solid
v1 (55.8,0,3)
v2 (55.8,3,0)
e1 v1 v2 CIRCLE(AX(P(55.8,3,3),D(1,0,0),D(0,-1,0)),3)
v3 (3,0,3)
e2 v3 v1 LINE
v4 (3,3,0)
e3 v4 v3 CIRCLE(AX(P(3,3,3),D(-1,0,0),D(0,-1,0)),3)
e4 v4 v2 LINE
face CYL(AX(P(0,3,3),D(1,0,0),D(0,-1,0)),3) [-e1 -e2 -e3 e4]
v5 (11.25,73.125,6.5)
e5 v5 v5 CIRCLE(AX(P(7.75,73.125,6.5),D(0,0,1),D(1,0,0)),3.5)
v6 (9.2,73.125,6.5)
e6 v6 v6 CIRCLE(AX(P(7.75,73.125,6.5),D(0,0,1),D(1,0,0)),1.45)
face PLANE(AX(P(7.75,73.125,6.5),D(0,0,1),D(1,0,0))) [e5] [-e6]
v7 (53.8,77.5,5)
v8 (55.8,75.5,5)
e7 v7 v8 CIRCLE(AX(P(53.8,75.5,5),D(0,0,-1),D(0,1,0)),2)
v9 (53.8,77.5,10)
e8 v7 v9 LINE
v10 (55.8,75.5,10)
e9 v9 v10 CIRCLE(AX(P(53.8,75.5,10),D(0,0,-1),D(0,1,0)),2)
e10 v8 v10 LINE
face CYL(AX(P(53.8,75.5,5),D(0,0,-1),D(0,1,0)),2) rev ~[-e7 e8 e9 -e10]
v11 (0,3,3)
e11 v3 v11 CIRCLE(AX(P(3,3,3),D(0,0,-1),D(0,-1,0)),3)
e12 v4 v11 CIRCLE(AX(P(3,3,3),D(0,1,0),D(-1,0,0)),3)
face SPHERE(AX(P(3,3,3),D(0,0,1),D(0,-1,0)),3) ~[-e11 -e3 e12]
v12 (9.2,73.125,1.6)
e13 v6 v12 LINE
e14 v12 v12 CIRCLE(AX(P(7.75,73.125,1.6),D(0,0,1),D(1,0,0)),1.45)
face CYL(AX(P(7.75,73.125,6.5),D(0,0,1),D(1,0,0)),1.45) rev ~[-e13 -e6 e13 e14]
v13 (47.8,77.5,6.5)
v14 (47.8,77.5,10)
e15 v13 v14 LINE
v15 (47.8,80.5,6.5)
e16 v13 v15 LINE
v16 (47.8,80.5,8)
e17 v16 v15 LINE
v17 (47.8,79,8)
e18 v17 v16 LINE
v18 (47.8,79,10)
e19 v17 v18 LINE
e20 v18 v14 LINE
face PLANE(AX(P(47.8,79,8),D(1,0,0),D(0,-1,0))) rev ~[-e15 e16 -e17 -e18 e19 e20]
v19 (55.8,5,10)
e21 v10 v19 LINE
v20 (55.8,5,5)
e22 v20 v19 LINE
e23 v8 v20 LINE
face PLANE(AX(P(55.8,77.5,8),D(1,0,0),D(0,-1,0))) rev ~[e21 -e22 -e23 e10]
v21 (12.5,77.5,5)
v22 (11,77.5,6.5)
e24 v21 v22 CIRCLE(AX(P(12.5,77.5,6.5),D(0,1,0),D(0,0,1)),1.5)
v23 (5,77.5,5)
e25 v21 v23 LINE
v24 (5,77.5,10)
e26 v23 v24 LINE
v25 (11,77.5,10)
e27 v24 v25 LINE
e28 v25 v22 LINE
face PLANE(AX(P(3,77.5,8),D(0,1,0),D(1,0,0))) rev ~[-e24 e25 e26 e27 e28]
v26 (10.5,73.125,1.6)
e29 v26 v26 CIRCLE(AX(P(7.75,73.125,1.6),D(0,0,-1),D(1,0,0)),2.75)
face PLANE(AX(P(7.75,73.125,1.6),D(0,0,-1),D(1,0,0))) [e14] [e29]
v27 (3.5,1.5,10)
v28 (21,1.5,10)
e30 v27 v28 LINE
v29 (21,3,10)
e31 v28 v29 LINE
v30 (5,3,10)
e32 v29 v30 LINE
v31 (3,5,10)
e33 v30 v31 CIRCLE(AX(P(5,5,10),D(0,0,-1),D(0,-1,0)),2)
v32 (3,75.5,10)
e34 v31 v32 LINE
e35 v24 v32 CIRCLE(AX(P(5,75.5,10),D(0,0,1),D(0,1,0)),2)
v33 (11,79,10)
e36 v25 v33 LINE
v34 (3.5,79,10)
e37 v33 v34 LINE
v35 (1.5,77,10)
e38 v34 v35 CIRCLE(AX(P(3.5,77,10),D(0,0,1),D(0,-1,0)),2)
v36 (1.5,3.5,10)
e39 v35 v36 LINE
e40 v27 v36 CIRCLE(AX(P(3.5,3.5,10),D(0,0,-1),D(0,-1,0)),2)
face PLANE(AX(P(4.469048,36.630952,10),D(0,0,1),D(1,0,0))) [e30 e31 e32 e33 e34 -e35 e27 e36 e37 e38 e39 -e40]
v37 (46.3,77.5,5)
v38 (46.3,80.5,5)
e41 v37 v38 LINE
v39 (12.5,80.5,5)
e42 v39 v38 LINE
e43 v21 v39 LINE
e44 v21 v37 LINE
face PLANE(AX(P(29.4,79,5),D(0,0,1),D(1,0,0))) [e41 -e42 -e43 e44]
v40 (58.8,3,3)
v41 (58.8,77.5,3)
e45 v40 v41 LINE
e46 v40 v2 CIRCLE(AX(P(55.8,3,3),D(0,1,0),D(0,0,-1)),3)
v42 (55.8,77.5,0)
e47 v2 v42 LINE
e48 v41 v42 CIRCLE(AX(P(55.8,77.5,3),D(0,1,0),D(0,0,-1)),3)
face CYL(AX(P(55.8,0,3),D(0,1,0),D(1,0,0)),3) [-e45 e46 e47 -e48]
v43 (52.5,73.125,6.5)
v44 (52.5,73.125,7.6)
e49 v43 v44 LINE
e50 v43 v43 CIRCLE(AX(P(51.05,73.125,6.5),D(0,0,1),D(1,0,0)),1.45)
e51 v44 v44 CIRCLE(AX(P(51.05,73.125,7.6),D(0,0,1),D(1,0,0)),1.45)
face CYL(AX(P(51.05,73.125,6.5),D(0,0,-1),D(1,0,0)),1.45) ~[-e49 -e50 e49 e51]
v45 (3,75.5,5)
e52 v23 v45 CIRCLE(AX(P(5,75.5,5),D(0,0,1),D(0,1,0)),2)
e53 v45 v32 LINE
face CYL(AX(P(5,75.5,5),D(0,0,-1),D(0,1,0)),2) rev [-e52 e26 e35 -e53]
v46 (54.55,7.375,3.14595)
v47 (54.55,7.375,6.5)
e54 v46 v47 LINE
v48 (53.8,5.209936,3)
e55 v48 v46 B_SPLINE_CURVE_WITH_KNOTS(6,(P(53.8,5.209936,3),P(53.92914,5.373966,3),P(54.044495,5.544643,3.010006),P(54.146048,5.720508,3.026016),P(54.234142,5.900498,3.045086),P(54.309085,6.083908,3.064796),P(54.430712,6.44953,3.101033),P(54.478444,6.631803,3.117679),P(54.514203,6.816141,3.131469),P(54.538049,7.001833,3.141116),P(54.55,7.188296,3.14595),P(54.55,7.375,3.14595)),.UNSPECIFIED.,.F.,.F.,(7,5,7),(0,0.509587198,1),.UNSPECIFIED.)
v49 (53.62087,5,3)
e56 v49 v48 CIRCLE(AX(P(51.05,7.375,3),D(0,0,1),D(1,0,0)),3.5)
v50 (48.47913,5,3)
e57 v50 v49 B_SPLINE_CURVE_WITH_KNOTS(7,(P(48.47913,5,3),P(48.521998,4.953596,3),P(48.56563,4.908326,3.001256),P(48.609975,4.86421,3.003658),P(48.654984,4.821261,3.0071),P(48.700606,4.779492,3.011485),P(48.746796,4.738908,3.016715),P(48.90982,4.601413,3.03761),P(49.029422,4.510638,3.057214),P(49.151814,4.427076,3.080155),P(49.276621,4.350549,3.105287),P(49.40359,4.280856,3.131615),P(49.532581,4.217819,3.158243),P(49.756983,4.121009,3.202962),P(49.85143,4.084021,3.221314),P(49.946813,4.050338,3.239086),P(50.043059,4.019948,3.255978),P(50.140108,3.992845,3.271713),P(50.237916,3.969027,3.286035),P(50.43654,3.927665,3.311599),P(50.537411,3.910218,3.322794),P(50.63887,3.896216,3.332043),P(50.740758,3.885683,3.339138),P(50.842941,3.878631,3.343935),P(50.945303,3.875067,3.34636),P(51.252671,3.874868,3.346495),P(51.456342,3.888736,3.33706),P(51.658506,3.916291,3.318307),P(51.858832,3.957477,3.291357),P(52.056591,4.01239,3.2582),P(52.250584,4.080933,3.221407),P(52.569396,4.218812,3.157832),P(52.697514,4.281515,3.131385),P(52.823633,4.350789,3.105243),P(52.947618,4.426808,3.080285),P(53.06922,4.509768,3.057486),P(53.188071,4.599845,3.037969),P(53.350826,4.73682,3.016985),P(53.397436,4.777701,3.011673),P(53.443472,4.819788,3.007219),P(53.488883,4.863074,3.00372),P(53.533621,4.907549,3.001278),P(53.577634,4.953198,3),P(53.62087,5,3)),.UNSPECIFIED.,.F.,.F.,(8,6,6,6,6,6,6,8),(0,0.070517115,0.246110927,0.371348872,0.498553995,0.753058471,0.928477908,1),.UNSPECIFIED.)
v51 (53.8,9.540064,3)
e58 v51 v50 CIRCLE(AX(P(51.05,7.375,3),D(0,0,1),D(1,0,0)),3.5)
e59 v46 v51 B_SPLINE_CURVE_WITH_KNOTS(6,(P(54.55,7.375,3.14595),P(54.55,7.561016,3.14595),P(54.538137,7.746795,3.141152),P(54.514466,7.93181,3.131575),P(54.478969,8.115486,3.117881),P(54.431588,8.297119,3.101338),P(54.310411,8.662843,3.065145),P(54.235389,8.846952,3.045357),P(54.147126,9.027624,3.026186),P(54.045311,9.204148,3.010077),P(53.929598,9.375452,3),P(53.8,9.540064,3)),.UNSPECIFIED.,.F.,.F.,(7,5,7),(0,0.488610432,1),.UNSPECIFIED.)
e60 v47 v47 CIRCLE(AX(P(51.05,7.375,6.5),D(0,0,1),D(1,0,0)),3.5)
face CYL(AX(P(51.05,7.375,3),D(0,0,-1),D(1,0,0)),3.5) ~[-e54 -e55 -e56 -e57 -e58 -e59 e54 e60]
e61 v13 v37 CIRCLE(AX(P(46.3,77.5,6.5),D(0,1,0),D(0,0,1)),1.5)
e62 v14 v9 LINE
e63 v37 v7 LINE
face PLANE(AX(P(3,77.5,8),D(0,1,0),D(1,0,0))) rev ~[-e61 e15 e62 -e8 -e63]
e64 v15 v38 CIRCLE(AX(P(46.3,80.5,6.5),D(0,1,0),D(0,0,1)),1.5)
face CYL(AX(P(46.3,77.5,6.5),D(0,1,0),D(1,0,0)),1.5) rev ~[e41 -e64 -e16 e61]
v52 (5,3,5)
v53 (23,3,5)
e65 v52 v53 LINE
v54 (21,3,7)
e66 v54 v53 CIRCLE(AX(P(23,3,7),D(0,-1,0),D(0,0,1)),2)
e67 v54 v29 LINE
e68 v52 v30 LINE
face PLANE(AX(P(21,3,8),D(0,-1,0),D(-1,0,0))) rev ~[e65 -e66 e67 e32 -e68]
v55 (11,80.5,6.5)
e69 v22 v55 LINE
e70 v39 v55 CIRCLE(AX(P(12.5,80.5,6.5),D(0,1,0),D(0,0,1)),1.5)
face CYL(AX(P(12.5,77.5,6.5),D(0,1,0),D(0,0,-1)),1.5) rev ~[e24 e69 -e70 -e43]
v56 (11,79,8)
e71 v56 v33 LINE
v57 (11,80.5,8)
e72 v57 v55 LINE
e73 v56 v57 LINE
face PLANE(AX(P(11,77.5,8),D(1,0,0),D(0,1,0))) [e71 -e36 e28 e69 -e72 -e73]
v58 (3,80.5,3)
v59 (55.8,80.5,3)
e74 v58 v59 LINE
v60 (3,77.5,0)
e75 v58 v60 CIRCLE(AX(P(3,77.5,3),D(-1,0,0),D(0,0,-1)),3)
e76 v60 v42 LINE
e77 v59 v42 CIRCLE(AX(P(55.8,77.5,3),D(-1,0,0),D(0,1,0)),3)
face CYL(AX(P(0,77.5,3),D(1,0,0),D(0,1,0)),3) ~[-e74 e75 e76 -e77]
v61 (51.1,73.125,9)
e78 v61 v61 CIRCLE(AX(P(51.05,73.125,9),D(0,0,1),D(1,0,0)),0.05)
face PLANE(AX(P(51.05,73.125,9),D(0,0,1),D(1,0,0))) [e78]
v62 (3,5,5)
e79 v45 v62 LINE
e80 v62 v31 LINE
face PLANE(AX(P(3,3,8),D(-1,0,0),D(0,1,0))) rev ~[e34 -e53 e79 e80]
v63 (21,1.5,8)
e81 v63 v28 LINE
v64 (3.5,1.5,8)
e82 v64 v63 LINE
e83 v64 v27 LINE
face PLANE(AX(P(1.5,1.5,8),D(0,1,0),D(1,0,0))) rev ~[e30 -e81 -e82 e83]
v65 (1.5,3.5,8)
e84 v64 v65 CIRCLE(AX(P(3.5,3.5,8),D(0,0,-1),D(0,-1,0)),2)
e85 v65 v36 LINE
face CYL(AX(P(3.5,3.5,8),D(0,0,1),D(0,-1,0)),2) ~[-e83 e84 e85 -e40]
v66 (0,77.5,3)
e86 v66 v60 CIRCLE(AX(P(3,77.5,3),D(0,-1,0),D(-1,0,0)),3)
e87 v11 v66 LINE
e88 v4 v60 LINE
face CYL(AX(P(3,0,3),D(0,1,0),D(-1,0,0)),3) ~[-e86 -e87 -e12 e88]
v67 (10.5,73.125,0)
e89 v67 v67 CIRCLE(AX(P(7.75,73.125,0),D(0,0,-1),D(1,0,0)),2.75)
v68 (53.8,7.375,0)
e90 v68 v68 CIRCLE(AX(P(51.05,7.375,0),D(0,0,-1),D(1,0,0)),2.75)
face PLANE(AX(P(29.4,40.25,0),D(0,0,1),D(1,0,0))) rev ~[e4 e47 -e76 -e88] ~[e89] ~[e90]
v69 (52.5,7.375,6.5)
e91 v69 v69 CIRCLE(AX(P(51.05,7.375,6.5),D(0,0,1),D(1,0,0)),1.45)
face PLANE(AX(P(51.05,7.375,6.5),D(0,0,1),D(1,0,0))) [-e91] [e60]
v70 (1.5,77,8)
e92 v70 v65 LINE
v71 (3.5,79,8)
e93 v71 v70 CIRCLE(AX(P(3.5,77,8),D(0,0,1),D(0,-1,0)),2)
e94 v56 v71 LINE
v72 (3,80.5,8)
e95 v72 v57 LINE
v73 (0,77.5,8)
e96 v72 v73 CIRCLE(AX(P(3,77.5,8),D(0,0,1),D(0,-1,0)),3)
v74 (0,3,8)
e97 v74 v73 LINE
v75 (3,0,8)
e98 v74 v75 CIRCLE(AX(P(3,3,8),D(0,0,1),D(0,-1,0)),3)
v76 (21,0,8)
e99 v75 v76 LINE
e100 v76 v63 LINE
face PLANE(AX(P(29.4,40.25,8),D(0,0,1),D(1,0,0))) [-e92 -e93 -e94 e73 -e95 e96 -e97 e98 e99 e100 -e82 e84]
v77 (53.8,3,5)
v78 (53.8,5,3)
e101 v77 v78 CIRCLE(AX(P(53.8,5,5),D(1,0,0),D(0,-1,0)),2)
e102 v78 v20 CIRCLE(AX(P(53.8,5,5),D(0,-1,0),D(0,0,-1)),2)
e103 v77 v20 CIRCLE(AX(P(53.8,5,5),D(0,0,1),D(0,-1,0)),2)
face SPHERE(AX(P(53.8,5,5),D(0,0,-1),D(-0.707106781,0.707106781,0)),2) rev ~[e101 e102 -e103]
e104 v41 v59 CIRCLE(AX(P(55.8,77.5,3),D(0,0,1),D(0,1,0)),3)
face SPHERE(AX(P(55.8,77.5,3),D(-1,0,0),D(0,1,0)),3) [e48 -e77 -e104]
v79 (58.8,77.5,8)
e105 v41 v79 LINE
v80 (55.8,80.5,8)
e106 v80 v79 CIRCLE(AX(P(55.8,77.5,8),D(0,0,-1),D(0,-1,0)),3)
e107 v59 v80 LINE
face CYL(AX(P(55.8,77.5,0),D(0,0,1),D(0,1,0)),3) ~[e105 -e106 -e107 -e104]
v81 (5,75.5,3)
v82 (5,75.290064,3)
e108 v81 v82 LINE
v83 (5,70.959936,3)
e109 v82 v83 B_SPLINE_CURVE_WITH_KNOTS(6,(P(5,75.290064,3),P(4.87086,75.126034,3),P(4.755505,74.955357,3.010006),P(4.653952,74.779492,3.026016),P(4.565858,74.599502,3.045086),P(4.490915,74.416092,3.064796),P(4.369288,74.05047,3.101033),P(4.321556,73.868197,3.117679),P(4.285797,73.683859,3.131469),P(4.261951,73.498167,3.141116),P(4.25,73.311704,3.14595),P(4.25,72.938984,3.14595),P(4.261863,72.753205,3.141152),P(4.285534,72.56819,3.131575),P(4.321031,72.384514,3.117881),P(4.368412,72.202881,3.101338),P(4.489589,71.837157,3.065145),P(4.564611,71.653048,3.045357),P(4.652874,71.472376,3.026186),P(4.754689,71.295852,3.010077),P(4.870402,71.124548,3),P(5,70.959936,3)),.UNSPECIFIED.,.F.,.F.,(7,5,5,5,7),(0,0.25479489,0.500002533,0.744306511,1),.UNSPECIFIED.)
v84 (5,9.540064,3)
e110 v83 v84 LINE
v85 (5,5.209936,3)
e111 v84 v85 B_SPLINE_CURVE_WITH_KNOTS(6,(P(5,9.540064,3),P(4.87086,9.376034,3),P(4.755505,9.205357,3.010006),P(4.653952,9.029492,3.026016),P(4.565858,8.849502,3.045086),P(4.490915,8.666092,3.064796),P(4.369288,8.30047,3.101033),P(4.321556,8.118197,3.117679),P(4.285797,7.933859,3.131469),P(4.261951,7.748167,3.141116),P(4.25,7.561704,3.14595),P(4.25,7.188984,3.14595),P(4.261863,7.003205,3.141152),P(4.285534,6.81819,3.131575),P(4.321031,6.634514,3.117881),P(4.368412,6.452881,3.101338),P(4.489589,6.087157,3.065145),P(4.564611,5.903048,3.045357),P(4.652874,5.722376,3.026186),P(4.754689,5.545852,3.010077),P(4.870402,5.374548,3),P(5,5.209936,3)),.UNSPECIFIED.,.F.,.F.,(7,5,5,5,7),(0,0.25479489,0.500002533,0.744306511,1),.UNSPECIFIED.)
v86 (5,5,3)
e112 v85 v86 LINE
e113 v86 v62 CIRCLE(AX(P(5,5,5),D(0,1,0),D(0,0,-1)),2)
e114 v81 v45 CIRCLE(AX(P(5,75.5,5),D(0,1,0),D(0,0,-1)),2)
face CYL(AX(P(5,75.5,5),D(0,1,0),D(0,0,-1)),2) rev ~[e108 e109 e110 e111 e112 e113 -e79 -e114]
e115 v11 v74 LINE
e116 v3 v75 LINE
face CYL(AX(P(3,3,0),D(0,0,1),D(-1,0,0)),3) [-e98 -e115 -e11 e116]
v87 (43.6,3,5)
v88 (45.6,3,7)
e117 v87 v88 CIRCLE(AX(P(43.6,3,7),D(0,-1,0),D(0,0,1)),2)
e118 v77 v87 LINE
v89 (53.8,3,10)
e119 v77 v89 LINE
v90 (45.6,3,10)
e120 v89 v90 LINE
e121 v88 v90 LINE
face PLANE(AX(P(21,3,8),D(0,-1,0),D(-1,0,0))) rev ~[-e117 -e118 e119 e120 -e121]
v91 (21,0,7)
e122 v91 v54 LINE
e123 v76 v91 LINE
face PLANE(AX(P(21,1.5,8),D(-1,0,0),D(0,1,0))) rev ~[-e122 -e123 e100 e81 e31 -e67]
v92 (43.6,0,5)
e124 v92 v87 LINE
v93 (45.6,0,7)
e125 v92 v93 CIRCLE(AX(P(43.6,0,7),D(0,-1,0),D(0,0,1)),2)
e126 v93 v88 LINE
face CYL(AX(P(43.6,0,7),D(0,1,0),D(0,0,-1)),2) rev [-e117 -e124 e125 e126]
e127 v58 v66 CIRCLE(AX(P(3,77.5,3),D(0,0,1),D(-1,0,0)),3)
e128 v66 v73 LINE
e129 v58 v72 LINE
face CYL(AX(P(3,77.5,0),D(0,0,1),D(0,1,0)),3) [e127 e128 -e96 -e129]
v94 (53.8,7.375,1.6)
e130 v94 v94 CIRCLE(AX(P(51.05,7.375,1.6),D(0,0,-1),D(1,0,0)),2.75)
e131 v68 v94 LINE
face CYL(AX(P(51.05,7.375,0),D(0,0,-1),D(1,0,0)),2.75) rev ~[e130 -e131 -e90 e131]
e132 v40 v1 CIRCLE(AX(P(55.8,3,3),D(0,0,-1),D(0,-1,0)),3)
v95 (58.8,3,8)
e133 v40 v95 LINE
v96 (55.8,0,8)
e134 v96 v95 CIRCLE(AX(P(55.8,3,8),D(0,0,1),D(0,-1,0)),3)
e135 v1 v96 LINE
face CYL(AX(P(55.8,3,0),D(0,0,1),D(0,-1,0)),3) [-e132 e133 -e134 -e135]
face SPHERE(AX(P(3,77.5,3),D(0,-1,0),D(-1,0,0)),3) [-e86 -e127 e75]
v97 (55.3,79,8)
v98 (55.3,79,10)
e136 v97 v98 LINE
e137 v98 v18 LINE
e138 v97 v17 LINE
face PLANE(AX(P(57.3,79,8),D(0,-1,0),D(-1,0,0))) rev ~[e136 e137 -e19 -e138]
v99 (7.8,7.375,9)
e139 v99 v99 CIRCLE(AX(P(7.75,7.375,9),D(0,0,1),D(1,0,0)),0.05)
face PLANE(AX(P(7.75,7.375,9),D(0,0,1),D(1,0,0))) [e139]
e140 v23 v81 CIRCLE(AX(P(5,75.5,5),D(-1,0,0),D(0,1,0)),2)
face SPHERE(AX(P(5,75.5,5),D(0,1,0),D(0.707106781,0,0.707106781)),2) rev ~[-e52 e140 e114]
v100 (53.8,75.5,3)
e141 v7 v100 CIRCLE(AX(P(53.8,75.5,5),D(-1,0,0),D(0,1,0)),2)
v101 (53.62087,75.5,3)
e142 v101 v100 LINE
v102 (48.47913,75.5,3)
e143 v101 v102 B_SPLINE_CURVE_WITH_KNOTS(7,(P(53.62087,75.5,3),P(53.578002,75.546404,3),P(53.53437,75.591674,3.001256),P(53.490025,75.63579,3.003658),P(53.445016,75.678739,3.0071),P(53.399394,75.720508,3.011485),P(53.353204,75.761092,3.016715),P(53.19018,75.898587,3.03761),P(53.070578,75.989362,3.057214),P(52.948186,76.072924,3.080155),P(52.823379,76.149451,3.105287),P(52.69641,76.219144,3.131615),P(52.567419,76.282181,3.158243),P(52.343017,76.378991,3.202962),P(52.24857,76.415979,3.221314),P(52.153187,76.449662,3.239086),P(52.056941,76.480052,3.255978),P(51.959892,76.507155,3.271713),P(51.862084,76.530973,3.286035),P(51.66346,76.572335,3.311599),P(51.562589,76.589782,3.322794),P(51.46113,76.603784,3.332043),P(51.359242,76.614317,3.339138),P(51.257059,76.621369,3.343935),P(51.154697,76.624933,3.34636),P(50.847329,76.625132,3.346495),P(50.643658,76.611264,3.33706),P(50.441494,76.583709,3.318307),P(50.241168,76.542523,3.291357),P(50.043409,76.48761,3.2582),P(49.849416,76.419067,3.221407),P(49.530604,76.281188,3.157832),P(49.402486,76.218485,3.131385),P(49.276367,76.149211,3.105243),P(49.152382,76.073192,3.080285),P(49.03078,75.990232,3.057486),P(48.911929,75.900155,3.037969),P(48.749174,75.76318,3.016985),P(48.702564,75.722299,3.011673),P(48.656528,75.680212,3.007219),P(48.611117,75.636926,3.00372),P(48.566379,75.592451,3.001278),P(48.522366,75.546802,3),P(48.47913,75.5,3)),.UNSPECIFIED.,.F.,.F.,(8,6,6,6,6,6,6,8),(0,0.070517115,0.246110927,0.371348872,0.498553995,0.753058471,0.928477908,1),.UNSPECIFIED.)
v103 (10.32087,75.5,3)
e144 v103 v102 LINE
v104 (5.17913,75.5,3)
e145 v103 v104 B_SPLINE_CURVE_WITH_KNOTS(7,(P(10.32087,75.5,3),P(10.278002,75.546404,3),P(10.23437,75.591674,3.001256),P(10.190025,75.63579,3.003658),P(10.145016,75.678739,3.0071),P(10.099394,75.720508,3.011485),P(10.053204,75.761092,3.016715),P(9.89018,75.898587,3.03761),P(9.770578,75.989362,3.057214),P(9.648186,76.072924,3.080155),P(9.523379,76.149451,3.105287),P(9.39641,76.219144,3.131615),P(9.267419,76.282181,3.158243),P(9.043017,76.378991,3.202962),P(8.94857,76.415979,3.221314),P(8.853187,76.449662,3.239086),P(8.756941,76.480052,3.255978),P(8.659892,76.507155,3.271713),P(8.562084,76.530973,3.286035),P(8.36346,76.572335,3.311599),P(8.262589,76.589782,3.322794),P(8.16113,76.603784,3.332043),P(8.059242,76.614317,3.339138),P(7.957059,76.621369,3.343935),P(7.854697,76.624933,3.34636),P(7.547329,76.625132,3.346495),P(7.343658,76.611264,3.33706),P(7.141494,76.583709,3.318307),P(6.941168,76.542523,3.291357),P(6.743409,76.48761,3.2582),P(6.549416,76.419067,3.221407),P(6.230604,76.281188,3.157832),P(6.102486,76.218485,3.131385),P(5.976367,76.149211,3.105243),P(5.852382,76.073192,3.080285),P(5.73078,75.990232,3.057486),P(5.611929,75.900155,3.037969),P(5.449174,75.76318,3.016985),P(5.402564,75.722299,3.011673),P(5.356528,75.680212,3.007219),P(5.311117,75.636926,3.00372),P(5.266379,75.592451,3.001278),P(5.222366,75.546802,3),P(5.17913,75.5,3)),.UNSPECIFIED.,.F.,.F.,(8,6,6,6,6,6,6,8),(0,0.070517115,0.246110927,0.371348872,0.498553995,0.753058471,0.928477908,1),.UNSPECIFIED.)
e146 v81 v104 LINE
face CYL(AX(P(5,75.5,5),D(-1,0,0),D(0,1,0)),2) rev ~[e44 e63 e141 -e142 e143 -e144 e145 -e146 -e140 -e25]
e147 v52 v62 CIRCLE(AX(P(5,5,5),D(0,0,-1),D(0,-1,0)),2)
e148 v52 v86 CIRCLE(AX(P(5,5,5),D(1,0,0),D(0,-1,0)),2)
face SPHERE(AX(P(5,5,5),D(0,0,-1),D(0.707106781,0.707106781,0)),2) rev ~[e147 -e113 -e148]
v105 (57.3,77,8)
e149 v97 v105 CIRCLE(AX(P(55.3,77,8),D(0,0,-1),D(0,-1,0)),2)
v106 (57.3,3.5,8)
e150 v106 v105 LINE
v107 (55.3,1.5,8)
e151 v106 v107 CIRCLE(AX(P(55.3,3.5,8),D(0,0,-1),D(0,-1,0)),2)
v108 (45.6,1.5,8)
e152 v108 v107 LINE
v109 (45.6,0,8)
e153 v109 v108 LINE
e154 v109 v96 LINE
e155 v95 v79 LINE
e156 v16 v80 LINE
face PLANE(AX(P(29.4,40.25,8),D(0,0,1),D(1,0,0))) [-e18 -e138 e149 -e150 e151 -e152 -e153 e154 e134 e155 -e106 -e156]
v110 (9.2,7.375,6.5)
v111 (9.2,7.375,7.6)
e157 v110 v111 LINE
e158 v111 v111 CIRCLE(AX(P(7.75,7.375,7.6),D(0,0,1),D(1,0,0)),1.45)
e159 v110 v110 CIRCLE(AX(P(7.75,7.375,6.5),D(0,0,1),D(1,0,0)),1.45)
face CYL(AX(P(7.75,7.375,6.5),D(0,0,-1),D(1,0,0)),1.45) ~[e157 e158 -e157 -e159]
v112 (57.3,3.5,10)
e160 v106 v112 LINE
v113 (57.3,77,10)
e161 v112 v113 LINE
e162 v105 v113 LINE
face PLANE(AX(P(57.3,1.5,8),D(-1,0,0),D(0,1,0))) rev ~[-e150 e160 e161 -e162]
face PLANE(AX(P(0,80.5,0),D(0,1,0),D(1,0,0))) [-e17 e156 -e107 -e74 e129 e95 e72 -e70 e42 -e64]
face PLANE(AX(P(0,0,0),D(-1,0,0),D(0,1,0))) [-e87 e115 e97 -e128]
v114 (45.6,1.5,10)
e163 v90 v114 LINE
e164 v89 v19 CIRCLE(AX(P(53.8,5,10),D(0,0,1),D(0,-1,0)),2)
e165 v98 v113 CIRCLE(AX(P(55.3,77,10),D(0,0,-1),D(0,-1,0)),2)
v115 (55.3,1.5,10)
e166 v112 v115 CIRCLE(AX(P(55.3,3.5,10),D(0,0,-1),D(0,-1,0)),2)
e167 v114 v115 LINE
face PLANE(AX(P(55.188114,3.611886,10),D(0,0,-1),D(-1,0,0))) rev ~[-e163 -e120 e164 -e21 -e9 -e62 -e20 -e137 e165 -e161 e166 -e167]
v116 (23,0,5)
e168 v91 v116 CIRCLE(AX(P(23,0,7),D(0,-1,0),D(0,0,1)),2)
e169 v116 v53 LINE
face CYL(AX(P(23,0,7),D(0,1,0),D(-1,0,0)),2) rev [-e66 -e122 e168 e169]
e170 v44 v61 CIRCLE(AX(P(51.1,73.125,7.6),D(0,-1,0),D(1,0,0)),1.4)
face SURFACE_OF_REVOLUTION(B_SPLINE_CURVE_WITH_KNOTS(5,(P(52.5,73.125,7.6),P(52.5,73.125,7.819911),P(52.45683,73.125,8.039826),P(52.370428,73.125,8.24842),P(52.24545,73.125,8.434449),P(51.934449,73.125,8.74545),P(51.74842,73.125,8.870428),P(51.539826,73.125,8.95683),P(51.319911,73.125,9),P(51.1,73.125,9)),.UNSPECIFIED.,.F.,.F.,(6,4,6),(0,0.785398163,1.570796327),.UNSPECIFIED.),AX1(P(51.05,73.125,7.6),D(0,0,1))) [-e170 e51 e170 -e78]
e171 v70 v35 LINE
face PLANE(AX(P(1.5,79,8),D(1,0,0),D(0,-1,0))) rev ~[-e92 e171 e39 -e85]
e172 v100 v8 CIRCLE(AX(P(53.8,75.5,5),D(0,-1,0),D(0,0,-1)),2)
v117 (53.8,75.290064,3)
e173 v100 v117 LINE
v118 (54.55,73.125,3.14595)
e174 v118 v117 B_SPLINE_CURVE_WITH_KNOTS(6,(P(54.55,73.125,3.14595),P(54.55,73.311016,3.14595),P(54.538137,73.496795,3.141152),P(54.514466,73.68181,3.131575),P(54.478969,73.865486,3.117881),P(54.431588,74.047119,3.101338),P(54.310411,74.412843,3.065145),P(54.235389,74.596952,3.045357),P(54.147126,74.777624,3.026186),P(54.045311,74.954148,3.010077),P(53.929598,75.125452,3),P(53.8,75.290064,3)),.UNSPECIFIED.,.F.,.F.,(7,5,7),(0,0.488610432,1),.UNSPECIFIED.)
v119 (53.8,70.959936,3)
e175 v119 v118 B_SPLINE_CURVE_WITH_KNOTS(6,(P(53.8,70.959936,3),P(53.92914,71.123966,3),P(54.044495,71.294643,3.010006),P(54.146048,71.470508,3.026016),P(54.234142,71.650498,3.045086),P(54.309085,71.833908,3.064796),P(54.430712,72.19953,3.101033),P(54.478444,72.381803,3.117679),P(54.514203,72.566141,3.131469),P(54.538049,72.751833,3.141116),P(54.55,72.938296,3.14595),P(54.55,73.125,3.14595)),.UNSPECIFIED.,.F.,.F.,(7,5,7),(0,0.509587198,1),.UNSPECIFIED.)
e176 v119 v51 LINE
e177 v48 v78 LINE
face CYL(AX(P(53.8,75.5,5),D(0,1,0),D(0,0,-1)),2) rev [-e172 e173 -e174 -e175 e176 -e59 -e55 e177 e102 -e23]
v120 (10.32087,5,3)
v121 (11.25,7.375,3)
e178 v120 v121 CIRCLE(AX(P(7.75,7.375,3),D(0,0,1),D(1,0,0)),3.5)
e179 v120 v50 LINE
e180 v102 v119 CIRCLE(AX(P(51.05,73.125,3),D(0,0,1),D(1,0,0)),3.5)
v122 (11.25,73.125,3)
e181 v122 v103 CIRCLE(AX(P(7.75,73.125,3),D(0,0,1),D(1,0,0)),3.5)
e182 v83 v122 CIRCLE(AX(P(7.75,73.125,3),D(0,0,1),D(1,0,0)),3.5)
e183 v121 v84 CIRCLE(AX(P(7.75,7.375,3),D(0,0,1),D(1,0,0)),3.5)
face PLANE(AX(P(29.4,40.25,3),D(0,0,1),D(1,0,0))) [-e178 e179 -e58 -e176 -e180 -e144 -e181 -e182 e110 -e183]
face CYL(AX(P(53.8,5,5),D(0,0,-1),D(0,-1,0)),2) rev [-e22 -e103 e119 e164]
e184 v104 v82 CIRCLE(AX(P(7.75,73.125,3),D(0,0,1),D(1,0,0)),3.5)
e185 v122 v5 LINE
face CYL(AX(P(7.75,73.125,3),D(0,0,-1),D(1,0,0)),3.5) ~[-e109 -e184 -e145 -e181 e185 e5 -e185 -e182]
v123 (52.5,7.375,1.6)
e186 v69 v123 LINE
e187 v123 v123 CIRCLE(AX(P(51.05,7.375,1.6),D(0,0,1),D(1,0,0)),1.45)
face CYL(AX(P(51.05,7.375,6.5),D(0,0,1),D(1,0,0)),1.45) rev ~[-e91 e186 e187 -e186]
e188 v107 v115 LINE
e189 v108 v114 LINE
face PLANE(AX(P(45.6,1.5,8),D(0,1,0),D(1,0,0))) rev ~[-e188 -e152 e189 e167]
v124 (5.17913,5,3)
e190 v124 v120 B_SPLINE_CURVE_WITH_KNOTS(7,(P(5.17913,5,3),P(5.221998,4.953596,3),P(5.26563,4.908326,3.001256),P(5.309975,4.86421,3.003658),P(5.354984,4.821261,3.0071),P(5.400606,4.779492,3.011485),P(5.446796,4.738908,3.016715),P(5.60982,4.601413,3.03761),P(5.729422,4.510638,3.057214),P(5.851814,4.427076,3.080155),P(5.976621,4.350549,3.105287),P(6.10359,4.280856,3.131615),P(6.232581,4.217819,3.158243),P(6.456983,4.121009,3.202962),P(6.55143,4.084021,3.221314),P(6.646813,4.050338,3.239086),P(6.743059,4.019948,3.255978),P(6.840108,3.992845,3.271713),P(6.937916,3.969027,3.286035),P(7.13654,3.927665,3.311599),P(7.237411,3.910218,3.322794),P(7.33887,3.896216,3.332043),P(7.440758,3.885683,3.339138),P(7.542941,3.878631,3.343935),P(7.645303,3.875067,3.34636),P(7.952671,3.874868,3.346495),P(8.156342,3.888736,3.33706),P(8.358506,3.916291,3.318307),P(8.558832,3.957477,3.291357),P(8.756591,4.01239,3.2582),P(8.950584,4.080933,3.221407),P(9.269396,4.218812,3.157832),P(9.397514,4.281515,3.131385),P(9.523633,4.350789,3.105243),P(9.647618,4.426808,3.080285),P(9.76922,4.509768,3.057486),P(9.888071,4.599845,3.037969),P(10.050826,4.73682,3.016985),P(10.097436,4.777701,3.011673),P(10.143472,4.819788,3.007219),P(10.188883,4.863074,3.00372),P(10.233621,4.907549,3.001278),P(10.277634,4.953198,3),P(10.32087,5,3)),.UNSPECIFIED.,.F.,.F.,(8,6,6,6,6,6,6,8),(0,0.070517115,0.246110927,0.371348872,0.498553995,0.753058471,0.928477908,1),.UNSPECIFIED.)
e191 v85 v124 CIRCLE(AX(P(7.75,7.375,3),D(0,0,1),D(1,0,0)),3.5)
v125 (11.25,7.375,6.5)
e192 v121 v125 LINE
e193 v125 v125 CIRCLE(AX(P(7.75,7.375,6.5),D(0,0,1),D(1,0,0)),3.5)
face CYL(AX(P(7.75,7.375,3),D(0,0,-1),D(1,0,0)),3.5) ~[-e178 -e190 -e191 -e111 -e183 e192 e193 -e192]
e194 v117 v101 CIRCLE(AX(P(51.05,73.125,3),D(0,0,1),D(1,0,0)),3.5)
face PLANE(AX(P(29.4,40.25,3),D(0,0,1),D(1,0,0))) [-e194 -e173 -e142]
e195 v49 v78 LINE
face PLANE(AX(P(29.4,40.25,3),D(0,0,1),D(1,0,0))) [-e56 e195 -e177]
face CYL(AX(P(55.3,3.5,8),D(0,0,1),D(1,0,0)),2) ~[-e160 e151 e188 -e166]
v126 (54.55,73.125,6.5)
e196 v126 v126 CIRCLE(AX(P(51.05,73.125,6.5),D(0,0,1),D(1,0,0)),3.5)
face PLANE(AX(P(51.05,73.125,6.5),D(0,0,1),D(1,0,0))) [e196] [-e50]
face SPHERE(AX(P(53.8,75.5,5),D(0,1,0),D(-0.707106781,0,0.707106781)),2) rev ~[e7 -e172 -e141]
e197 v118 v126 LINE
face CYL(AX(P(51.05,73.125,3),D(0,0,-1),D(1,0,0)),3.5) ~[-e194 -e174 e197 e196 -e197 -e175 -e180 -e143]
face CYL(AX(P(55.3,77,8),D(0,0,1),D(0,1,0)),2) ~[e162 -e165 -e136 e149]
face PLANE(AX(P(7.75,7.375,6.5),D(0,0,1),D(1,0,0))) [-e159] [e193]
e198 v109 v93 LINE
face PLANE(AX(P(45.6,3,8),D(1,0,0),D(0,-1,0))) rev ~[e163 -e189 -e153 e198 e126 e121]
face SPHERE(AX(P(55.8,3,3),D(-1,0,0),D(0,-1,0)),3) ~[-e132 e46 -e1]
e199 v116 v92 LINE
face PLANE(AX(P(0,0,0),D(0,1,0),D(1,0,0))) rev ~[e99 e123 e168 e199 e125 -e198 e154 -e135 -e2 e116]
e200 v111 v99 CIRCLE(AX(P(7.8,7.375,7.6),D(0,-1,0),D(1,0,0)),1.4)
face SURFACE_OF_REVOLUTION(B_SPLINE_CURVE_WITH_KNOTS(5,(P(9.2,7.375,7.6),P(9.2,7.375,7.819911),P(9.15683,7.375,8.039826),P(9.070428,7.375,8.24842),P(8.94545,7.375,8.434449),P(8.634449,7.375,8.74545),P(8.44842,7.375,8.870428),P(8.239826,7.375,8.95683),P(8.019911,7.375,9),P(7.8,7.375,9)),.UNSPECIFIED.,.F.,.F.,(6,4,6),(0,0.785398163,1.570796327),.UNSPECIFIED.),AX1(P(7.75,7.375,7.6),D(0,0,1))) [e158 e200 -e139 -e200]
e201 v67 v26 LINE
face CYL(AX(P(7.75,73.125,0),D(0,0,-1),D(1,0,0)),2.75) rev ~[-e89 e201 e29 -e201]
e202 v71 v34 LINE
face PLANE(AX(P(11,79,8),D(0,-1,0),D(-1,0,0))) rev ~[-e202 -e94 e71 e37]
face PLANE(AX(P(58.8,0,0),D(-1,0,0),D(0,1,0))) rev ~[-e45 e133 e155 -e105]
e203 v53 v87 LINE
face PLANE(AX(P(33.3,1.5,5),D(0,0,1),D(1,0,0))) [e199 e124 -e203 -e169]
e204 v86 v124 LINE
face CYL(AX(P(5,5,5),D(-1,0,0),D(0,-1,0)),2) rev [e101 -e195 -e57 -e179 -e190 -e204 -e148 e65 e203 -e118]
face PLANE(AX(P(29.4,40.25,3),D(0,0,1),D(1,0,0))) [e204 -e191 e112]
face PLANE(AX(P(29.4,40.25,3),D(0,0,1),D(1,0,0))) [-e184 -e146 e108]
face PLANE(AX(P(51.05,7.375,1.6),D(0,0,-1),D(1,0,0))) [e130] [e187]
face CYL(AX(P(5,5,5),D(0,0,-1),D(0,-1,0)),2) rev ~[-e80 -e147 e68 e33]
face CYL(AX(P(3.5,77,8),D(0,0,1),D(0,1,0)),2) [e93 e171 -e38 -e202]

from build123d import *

# Parameters (mm, degrees)
F0_W          = 58.8
F0_H          = 80.5
F1_DEPTH      = 8
F2_W          = 52.8
F2_H          = 74.5
F3_DEPTH      = 5
F5_R          = 3.5
F6_DEPTH      = 3.5
F9_R          = 1.45
F7_R          = 1.45
F11_DEPTH     = 6.501
F8_R          = 1.45
F12_DEPTH     = 2.5
F10_R         = 1.45
F13_R         = 1.4
F14_W         = 36.8
F14_H         = 3
F15_DEPTH     = 3
F16_W         = 24.6
F16_H         = 3
F17_DEPTH     = 3
F20_DEPTH     = 2
F21_R         = 3
F22_T1_DEPTH  = 5
F22_T3_DEPTH  = 70.5
F22_T5_DEPTH  = 48.8
F22_S9_W      = 2
F22_S9_H      = 2
F22_T10_DEPTH = 2
F22_S15_W     = 2
F22_S15_H     = 2
F22_T16_DEPTH = 2
F22_S21_W     = 2
F22_S21_H     = 2
F22_T22_DEPTH = 2
F22_S27_W     = 2
F22_S27_H     = 2
F22_T28_DEPTH = 2
F23_R         = 2
F24_R         = 1.5
F25_R         = 2
F26_R         = 2.75
F27_DEPTH     = 1.6


# Not quite as in the source:
# - a fillet or chamfer that OpenCascade refuses, or shapes differently, is made with other operations: its cross-section is extruded or revolved along the edge and cut away or added


with BuildPart() as f1:
    # F0 (on Top) → F1 (new body)
    with BuildSketch(Plane.XY):
        with Locations((29.4, 40.25)):
            Rectangle(F0_W, F0_H)
    extrude(amount=F1_DEPTH)

    # F2 (on face) → F3 (cut)
    with BuildSketch(Plane.XY.offset(8)):
        with Locations((29.4, 40.25)):
            Rectangle(F2_W, F2_H)
    extrude(amount=-F3_DEPTH, mode=Mode.SUBTRACT)

    # F5 (on face) → F6 (join)
    with BuildSketch(Plane.XY.offset(3)):
        with Locations((7.75, 7.375)):
            Circle(F5_R)
        with Locations((7.75, 73.125)):
            Circle(F5_R)
        with Locations((51.05, 73.125)):
            Circle(F5_R)
        with Locations((51.05, 7.375)):
            Circle(F5_R)
    extrude(amount=F6_DEPTH)

    # F9 (on face) + F7 (on face) → F11 (cut, through all)
    with BuildSketch(Plane.XY.offset(6.5)):
        with Locations((7.75, 73.125)):
            Circle(F9_R)
    with BuildSketch(Plane.XY.offset(6.5)):
        with Locations((51.05, 7.375)):
            Circle(F7_R)
    extrude(amount=-F11_DEPTH, mode=Mode.SUBTRACT)

    # F8 (on face) → F12 (join)
    with BuildSketch(Plane.XY.offset(6.5)):
        with Locations((51.05, 73.125)):
            Circle(F8_R)
    extrude(amount=F12_DEPTH)

    # F10 (on face) → F12, piece 2 (join)
    with BuildSketch(Plane.XY.offset(6.5)):
        with Locations((7.75, 7.375)):
            Circle(F10_R)
    extrude(amount=F12_DEPTH)

    # F13
    f13_edges = [f1.edges().sort_by_distance(p)[0] for p in [
        (6.3, 7.375, 9),
        (49.6, 73.125, 9),
    ]]
    fillet(f13_edges, radius=F13_R)

    # F14 (on face) → F15 (cut)
    with BuildSketch(Plane.XY.offset(8)):
        with Locations((29.4, 79)):
            Rectangle(F14_W, F14_H)
    extrude(amount=-F15_DEPTH, mode=Mode.SUBTRACT)

    # F16 (on face) → F17 (cut)
    with BuildSketch(Plane.XY.offset(8)):
        with Locations((33.3, 1.5)):
            Rectangle(F16_W, F16_H)
    extrude(amount=-F17_DEPTH, mode=Mode.SUBTRACT)

    # F18 (on face) → F20 (join)
    with BuildSketch(Plane.XY.offset(8)):
        Polygon((47.8, 79), (47.8, 77.5), (55.8, 77.5), (55.8, 3), (45.6, 3), (45.6, 1.5), (57.3, 1.5), (57.3, 79), align=None)
    extrude(amount=F20_DEPTH)

    # F19 (on face) → F20, piece 2 (join)
    with BuildSketch(Plane.XY.offset(8)):
        Polygon((1.5, 1.5), (21, 1.5), (21, 3), (3, 3), (3, 77.5), (11, 77.5), (11, 79), (1.5, 79), align=None)
    extrude(amount=F20_DEPTH)

    # F21
    f21_edges = [f1.edges().sort_by_distance(p)[0] for p in [
        (0, 0, 4),
        (29.4, 0, 0),
        (58.8, 0, 4),
        (0, 40.25, 0),
        (0, 80.5, 4),
        (29.4, 80.5, 0),
        (58.8, 80.5, 4),
        (58.8, 40.25, 0),
    ]]
    fillet(f21_edges, radius=F21_R)

    # F22: fillet of radius 2 on 8 edges, made by hand

    # F22_s2 → F22_t1 (join)
    with BuildSketch(Plane.XY.offset(5)):
        with BuildLine():
            ThreePointArc((53.8, 3), (55.2142135624, 3.5857864376), (55.8, 5))
            Line((55.8, 5), (55.8, 3))
            Line((55.8, 3), (53.8, 3))
        make_face()
        with BuildLine():
            ThreePointArc((5, 3), (3.5857864376, 3.5857864376), (3, 5))
            Line((3, 5), (3, 3))
            Line((3, 3), (5, 3))
        make_face()
        with BuildLine():
            ThreePointArc((5, 77.5), (3.5857864376, 76.9142135624), (3, 75.5))
            Line((3, 75.5), (3, 77.5))
            Line((3, 77.5), (5, 77.5))
        make_face()
        with BuildLine():
            ThreePointArc((53.8, 77.5), (55.2142135624, 76.9142135624), (55.8, 75.5))
            Line((55.8, 75.5), (55.8, 77.5))
            Line((55.8, 77.5), (53.8, 77.5))
        make_face()
    extrude(amount=F22_T1_DEPTH)

    # F22_s4 → F22_t3 (join)
    with BuildSketch(Plane.XZ.offset(-75.5)):
        with BuildLine():
            ThreePointArc((53.8, 3), (55.2142135624, 3.5857864376), (55.8, 5))
            Line((55.8, 5), (55.8, 3))
            Line((55.8, 3), (53.8, 3))
        make_face()
        with BuildLine():
            ThreePointArc((5, 3), (3.5857864376, 3.5857864376), (3, 5))
            Line((3, 5), (3, 3))
            Line((3, 3), (5, 3))
        make_face()
    extrude(amount=F22_T3_DEPTH)

    # F22_s6 → F22_t5 (join)
    with BuildSketch(Plane.YZ.offset(5)):
        with BuildLine():
            ThreePointArc((3, 5), (3.5857864376, 3.5857864376), (5, 3))
            Line((5, 3), (3, 3))
            Line((3, 3), (3, 5))
        make_face()
        with BuildLine():
            ThreePointArc((77.5, 5), (76.9142135624, 3.5857864376), (75.5, 3))
            Line((75.5, 3), (77.5, 3))
            Line((77.5, 3), (77.5, 5))
        make_face()
    extrude(amount=F22_T5_DEPTH)


with BuildPart() as f22_tool8:
    # F22_s9 → F22_t10 (new body)
    with BuildSketch(Plane.XY.offset(5)):
        with Locations((54.8, 4)):
            Rectangle(F22_S9_W, F22_S9_H)
    extrude(amount=-F22_T10_DEPTH)

    # F22_s11 → F22_t12 (revolve, cut)
    with BuildSketch(Plane(origin=(53.8, 5, 5), x_dir=(-0.7071067812, 0.7071067812, 0), z_dir=(-0.7071067812, -0.7071067812, 0))):
        with BuildLine():
            ThreePointArc((0, -2), (2, 0), (0, 2))
            Line((0, 2), (0, -2))
        make_face()
    revolve(axis=Axis((53.8, 5, 5), (0, 0, -1)), mode=Mode.SUBTRACT)


with BuildPart() as f1_1:
    add(f1.part)

    # F22_t7: union F22_tool8
    add(f22_tool8.part)


with BuildPart() as f22_tool14:
    # F22_s15 → F22_t16 (new body)
    with BuildSketch(Plane.XY.offset(5)):
        with Locations((4, 4)):
            Rectangle(F22_S15_W, F22_S15_H)
    extrude(amount=-F22_T16_DEPTH)

    # F22_s17 → F22_t18 (revolve, cut)
    with BuildSketch(Plane(origin=(5, 5, 5), x_dir=(0.7071067812, 0.7071067812, 0), z_dir=(-0.7071067812, 0.7071067812, 0))):
        with BuildLine():
            ThreePointArc((0, -2), (2, 0), (0, 2))
            Line((0, 2), (0, -2))
        make_face()
    revolve(axis=Axis((5, 5, 5), (0, 0, -1)), mode=Mode.SUBTRACT)


with BuildPart() as f1_2:
    add(f1_1.part)

    # F22_t13: union F22_tool14
    add(f22_tool14.part)


with BuildPart() as f22_tool20:
    # F22_s21 → F22_t22 (new body)
    with BuildSketch(Plane.XZ.offset(-75.5)):
        with Locations((4, 4)):
            Rectangle(F22_S21_W, F22_S21_H)
    extrude(amount=-F22_T22_DEPTH)

    # F22_s23 → F22_t24 (revolve, cut)
    with BuildSketch(Plane(origin=(5, 75.5, 5), x_dir=(0.7071067812, 0, 0.7071067812), z_dir=(-0.7071067812, 0, 0.7071067812))):
        with BuildLine():
            ThreePointArc((0, -2), (2, 0), (0, 2))
            Line((0, 2), (0, -2))
        make_face()
    revolve(axis=Axis((5, 75.5, 5), (0, 1, 0)), mode=Mode.SUBTRACT)


with BuildPart() as f1_3:
    add(f1_2.part)

    # F22_t19: union F22_tool20
    add(f22_tool20.part)


with BuildPart() as f22_tool26:
    # F22_s27 → F22_t28 (new body)
    with BuildSketch(Plane.XZ.offset(-75.5)):
        with Locations((54.8, 4)):
            Rectangle(F22_S27_W, F22_S27_H)
    extrude(amount=-F22_T28_DEPTH)

    # F22_s29 → F22_t30 (revolve, cut)
    with BuildSketch(Plane(origin=(53.8, 75.5, 5), x_dir=(-0.7071067812, 0, 0.7071067812), z_dir=(-0.7071067812, 0, -0.7071067812))):
        with BuildLine():
            ThreePointArc((0, -2), (2, 0), (0, 2))
            Line((0, 2), (0, -2))
        make_face()
    revolve(axis=Axis((53.8, 75.5, 5), (0, 1, 0)), mode=Mode.SUBTRACT)


with BuildPart() as f1_4:
    add(f1_3.part)

    # F22_t25: union F22_tool26
    add(f22_tool26.part)

    # F23
    f23_edges = [f1_4.edges().sort_by_distance(p)[0] for p in [
        (57.3, 79, 9),
        (1.5, 79, 9),
        (1.5, 1.5, 9),
        (57.3, 1.5, 9),
    ]]
    fillet(f23_edges, radius=F23_R)

    # F24
    f24_edges = [f1_4.edges().sort_by_distance(p)[0] for p in [
        (11, 79, 5),
        (47.8, 79, 5),
    ]]
    fillet(f24_edges, radius=F24_R)

    # F25
    f25_edges = [f1_4.edges().sort_by_distance(p)[0] for p in [
        (21, 1.5, 5),
        (45.6, 1.5, 5),
    ]]
    fillet(f25_edges, radius=F25_R)

    # F26 (on face) → F27 (cut)
    with BuildSketch(Plane(origin=(0, 0, 0), x_dir=(1, 0, 0), z_dir=(0, 0, -1))):
        with Locations((51.05, -7.375)):
            Circle(F26_R)
        with Locations((7.75, -73.125)):
            Circle(F26_R)
    extrude(amount=-F27_DEPTH, mode=Mode.SUBTRACT)


solid = f1_4.part
